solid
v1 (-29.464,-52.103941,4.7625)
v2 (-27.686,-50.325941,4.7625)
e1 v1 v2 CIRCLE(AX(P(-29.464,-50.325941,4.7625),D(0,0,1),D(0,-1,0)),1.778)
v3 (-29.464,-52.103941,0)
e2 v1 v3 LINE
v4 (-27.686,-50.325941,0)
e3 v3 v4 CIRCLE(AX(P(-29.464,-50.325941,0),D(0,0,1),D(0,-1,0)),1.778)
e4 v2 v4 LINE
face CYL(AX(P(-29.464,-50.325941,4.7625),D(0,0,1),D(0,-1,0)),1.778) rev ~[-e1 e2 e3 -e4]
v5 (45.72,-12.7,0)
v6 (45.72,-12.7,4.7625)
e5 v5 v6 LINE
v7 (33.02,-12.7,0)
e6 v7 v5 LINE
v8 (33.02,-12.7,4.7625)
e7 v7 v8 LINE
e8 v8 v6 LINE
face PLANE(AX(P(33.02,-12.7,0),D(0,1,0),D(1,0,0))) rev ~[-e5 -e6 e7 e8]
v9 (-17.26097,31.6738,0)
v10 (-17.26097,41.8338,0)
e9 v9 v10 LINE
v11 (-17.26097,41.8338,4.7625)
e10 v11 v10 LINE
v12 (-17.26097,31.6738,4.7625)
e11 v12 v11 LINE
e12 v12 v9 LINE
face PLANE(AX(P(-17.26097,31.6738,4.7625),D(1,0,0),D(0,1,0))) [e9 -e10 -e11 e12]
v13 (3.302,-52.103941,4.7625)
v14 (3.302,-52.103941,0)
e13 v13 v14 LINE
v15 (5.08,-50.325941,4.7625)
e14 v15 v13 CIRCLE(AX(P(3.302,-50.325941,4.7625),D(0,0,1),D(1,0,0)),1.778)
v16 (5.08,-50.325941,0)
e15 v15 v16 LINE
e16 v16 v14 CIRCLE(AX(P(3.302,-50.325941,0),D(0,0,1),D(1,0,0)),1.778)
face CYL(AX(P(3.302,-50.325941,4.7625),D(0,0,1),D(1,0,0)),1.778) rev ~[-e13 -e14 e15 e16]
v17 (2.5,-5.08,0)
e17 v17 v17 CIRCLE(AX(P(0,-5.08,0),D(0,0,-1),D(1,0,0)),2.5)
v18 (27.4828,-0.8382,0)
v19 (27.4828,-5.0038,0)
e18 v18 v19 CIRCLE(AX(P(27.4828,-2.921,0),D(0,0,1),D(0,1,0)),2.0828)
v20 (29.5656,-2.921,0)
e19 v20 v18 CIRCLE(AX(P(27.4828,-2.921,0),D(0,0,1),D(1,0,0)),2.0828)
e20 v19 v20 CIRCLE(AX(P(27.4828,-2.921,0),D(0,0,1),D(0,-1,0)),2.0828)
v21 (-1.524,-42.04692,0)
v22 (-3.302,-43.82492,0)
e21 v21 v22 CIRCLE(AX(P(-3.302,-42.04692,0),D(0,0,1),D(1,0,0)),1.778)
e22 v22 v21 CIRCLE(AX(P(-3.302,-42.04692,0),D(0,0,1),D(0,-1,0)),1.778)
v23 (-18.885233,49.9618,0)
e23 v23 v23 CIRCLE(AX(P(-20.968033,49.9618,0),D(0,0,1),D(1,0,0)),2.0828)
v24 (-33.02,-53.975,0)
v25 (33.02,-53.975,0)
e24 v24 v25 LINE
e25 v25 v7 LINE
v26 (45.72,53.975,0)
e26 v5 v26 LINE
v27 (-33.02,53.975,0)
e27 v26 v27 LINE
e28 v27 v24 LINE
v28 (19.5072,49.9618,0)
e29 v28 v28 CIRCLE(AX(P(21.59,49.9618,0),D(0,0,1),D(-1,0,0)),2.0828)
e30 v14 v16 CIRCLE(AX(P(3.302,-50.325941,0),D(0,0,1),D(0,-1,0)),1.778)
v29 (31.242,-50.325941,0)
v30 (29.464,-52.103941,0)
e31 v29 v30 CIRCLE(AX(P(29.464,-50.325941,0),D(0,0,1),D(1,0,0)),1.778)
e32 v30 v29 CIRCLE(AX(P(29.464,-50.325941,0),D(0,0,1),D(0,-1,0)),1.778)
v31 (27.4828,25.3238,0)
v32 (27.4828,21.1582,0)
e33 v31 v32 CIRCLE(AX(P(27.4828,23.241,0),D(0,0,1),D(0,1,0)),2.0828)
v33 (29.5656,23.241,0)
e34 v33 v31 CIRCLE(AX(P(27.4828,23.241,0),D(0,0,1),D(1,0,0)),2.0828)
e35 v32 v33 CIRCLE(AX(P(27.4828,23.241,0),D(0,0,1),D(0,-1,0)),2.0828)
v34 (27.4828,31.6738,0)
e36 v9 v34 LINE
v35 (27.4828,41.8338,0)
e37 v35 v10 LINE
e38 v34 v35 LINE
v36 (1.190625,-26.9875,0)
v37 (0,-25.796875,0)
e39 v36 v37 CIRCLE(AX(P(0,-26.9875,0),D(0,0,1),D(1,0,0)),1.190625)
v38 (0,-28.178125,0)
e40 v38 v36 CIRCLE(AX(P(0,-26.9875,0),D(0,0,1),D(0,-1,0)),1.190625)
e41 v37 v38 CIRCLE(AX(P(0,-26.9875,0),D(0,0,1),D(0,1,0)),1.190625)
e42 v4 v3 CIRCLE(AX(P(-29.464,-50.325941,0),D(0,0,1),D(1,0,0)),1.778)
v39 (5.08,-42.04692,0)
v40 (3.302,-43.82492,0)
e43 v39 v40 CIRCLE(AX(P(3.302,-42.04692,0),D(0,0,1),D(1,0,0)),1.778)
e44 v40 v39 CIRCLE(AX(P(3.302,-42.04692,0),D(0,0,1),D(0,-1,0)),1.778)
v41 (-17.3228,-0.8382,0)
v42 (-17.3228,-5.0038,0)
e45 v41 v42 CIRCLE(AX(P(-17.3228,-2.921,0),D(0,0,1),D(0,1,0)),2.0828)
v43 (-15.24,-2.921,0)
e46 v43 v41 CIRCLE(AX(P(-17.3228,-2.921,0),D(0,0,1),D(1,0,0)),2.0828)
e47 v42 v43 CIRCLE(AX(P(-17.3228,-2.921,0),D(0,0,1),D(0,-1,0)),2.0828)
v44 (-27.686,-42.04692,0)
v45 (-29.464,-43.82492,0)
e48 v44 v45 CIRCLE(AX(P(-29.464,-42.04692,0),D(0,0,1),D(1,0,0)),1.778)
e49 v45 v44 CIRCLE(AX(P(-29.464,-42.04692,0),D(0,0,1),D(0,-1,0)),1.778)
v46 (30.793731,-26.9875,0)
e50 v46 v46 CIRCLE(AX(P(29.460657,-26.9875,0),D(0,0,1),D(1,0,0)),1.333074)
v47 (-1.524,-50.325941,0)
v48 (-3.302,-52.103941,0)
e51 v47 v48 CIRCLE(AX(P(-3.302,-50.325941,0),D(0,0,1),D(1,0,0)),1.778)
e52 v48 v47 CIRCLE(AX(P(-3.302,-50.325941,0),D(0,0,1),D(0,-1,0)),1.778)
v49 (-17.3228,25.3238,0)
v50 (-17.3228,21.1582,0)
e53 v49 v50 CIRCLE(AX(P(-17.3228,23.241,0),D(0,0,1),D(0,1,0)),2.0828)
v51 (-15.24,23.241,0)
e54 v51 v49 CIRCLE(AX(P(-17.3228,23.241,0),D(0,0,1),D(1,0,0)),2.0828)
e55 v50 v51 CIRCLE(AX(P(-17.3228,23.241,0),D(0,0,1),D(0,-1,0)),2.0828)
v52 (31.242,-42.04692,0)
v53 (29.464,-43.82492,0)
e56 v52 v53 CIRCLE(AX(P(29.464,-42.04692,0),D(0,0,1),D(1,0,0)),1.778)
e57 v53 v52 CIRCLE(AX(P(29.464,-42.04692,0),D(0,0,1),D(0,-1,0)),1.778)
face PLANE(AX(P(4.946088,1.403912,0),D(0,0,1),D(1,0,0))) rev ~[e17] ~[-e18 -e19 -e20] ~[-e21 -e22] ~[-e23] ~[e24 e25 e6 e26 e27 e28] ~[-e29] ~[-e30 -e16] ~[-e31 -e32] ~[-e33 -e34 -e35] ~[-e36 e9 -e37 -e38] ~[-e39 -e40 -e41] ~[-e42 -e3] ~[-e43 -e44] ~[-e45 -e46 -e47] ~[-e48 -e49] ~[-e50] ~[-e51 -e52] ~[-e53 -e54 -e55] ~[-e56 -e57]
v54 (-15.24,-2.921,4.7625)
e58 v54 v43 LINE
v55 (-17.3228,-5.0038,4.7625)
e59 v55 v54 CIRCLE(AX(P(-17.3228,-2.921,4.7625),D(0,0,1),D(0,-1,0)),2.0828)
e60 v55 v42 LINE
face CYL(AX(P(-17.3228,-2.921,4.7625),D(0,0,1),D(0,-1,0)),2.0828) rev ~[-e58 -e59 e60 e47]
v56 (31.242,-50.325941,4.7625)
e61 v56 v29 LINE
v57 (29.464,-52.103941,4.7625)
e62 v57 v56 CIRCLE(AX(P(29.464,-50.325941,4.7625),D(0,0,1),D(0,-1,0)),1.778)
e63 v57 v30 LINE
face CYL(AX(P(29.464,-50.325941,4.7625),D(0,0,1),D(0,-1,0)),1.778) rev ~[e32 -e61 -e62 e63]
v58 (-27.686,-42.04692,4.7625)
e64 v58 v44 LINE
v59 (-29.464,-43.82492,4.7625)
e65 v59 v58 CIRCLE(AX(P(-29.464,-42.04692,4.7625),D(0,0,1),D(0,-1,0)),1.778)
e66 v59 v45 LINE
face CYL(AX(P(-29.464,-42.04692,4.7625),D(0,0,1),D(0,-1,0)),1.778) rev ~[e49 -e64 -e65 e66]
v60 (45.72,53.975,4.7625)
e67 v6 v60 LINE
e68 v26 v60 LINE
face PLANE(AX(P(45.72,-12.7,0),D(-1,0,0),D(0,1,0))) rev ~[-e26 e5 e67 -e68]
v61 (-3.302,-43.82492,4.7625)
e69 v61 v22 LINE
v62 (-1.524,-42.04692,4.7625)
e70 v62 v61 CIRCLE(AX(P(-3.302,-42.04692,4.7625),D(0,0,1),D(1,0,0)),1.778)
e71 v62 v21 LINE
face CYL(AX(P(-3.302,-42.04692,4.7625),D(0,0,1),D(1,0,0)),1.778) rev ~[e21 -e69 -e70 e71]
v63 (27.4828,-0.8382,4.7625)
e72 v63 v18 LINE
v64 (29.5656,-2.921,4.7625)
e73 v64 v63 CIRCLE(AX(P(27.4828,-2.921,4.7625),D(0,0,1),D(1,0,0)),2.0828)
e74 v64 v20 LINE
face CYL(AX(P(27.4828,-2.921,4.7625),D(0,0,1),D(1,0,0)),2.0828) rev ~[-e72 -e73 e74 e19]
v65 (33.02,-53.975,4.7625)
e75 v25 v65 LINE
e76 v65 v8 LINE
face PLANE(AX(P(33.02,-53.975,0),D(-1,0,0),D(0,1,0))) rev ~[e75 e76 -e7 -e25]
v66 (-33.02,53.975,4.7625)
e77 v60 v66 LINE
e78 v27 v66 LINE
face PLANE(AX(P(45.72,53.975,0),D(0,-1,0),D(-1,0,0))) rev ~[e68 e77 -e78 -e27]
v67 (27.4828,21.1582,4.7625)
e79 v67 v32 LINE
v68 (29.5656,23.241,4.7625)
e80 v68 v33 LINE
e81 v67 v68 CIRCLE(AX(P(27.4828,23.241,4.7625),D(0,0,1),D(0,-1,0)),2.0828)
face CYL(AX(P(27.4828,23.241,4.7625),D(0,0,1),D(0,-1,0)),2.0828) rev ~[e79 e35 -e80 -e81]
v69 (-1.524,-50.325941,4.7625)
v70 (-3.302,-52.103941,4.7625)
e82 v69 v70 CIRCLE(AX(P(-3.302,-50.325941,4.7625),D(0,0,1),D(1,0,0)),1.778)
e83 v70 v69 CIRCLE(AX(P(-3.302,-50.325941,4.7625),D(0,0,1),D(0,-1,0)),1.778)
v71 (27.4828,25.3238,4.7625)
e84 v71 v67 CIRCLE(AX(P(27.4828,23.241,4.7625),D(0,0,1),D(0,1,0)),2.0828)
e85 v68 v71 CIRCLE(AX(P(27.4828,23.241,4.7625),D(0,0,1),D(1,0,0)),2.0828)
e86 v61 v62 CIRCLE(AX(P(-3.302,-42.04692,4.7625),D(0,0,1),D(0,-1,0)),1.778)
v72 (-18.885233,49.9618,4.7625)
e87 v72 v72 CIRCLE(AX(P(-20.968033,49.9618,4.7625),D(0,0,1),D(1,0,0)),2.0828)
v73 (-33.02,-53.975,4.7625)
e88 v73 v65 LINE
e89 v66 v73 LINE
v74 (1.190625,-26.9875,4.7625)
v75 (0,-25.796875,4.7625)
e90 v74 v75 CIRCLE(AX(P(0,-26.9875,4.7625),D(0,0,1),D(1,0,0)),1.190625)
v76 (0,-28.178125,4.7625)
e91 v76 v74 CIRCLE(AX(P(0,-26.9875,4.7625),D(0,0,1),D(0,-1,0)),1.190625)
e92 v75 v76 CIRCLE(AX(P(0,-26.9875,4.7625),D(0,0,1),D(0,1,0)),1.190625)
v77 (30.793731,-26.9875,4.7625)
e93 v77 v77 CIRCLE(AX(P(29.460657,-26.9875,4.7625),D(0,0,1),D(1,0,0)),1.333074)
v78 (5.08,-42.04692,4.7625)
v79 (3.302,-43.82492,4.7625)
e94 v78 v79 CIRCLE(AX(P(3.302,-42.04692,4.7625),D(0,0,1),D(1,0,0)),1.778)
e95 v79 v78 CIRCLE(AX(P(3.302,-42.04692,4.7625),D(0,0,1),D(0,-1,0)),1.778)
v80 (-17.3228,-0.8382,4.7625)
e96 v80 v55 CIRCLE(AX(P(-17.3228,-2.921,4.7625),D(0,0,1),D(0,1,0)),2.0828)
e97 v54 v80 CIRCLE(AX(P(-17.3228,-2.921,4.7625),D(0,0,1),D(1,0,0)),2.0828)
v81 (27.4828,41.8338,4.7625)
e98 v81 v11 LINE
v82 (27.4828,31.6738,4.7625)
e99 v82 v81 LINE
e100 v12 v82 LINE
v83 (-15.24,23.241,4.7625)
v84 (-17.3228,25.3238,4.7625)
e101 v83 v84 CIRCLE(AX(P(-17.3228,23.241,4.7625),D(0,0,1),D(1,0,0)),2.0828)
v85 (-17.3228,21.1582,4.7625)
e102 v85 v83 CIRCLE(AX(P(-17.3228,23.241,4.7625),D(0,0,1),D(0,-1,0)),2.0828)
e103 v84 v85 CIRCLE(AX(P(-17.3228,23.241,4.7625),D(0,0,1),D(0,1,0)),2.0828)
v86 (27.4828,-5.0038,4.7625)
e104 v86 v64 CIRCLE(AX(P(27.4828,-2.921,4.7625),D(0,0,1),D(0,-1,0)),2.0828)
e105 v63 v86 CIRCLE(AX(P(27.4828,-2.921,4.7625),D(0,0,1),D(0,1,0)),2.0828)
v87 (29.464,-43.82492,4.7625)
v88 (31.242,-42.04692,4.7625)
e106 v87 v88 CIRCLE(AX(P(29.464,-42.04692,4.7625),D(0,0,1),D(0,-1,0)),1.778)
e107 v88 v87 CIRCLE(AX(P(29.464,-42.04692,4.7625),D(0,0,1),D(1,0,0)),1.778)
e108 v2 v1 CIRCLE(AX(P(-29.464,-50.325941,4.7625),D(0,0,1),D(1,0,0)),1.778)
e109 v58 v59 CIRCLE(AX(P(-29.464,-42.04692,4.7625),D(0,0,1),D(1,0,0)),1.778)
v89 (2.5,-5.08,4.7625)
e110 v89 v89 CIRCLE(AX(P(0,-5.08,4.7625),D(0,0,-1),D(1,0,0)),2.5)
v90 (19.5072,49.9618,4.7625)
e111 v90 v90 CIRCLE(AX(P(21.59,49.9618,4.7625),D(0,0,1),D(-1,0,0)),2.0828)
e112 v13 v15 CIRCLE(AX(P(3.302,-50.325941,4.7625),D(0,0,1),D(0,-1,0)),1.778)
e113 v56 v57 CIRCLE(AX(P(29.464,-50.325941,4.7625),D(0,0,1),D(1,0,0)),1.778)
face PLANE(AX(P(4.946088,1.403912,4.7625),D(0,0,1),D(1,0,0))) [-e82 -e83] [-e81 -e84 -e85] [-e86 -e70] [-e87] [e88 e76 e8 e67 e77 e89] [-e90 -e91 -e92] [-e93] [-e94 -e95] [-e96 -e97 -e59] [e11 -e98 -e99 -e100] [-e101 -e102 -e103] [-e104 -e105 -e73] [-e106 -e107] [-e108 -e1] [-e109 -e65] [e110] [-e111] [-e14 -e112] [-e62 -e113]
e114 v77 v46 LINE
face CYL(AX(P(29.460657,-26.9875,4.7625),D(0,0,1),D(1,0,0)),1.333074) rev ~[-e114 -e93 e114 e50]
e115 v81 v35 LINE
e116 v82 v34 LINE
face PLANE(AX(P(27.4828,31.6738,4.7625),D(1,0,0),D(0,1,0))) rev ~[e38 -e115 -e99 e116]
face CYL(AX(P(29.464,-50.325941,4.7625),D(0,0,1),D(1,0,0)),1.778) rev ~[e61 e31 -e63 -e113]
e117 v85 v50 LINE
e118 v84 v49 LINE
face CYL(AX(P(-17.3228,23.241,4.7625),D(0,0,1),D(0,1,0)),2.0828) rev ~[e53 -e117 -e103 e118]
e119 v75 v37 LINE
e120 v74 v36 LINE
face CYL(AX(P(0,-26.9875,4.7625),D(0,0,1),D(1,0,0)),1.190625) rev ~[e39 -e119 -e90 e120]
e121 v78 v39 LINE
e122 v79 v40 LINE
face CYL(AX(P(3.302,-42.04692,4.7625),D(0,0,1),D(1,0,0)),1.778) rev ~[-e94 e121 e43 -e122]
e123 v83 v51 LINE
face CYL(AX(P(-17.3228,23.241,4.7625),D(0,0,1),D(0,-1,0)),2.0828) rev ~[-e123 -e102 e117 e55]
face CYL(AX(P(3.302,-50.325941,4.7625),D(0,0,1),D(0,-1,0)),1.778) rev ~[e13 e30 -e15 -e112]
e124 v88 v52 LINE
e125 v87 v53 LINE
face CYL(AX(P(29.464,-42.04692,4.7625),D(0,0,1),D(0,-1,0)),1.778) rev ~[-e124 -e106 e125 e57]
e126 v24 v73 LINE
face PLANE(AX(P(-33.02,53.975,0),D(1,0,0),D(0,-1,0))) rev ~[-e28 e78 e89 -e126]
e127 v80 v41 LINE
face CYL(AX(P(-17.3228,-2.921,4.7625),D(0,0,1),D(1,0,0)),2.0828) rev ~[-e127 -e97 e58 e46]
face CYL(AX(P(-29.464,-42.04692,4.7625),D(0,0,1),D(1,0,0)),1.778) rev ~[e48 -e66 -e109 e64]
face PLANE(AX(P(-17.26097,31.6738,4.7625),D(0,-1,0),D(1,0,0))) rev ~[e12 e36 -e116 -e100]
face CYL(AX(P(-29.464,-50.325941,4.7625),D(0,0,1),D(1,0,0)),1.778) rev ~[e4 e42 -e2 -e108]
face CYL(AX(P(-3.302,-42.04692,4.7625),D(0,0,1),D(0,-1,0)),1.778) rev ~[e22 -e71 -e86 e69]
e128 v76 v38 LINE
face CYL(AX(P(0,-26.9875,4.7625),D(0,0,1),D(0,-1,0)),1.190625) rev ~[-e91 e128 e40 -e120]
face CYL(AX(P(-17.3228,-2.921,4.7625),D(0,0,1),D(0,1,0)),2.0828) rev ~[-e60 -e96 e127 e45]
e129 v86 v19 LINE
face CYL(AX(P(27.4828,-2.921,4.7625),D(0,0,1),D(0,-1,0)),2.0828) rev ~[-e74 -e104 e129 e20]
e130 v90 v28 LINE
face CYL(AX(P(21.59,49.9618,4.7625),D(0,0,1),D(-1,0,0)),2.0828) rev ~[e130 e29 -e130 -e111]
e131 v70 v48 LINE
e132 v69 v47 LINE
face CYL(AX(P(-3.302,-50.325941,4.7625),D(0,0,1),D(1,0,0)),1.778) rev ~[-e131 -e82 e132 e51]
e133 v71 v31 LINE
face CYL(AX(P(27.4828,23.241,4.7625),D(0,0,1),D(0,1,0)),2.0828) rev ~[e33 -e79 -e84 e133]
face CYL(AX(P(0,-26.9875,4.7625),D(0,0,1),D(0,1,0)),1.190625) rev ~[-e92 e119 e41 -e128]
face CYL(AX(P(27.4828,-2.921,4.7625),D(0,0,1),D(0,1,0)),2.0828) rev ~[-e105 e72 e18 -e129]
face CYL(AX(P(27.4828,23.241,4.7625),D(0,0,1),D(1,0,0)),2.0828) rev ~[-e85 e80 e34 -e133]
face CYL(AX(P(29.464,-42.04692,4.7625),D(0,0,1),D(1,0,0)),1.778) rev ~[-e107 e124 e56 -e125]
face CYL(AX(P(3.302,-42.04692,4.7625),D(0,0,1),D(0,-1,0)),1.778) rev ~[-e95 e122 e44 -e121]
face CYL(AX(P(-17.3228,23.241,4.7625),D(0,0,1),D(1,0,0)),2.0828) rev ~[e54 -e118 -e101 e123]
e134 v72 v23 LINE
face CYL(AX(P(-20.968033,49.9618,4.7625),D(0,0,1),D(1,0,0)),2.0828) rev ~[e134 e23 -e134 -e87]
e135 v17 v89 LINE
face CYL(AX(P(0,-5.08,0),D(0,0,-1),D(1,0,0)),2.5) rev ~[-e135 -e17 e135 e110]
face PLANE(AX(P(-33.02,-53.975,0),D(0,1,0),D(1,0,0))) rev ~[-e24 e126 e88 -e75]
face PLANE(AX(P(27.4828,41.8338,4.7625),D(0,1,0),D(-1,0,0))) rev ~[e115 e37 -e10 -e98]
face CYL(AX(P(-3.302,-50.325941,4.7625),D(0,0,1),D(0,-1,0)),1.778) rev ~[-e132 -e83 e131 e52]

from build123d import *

# Parameters (mm, degrees)
F1_DEPTH  = 4.7625
F2_W      = 23.6109700747
F2_H      = 10.16
F2_W_2    = 21.1328
F3_DEPTH  = 25.4
F4_R      = 2.5
F5_DEPTH  = 25.4
F6_R      = 1.3330740387
F7_DEPTH  = 25.4
F2_R      = 2.0828
F8_DEPTH  = 25.4
F10_DEPTH = 25.4


# Not quite as in the source:
# - a feature names something its author has since deleted; it is built from what else it names


with BuildPart() as f1:
    # F0 (on Top) → F1 (new body)
    with BuildSketch(Plane.XY):
        Polygon((45.72, 53.975), (33.02, 53.975), (-33.02, 53.975), (-33.02, -53.975), (33.02, -53.975), (33.02, -12.7), (45.72, -12.7), align=None)
    extrude(amount=F1_DEPTH)

    # F2 (on face) → F3 (cut)
    with BuildSketch(Plane.XY.offset(4.7625)):
        with Locations((-5.4554850374, 36.7538)):
            Rectangle(F2_W, F2_H)
        with Locations((16.9164, 36.7538)):
            Rectangle(F2_W_2, F2_H)
        with BuildLine():
            ThreePointArc((29.5656, 23.241), (28.9555620039, 24.7137620039), (27.4828, 25.3238))
            Line((27.4828, 25.3238), (27.4828, 21.1582))
            ThreePointArc((27.4828, 21.1582), (28.9555620039, 21.7682379961), (29.5656, 23.241))
        make_face()
        with BuildLine():
            Line((27.4828, 21.1582), (27.4828, 25.3238))
            ThreePointArc((27.4828, 25.3238), (25.4, 23.241), (27.4828, 21.1582))
        make_face()
        with BuildLine():
            ThreePointArc((27.4828, -0.8382), (25.4, -2.921), (27.4828, -5.0038))
            Line((27.4828, -5.0038), (27.4828, -0.8382))
        make_face()
        with BuildLine():
            Line((27.4828, -0.8382), (27.4828, -5.0038))
            ThreePointArc((27.4828, -5.0038), (28.9555620039, -4.3937620039), (29.5656, -2.921))
            ThreePointArc((29.5656, -2.921), (28.9555620039, -1.4482379961), (27.4828, -0.8382))
        make_face()
        with BuildLine():
            ThreePointArc((-15.24, 23.241), (-15.8500379961, 24.7137620039), (-17.3228, 25.3238))
            Line((-17.3228, 25.3238), (-17.3228, 21.1582))
            ThreePointArc((-17.3228, 21.1582), (-15.8500379961, 21.7682379961), (-15.24, 23.241))
        make_face()
        with BuildLine():
            Line((-17.3228, 21.1582), (-17.3228, 25.3238))
            ThreePointArc((-17.3228, 25.3238), (-19.4056, 23.241), (-17.3228, 21.1582))
        make_face()
        with BuildLine():
            ThreePointArc((-17.3228, -0.8382), (-19.4056, -2.921), (-17.3228, -5.0038))
            Line((-17.3228, -5.0038), (-17.3228, -0.8382))
        make_face()
        with BuildLine():
            Line((-17.3228, -0.8382), (-17.3228, -5.0038))
            ThreePointArc((-17.3228, -5.0038), (-15.8500379961, -4.3937620039), (-15.24, -2.921))
            ThreePointArc((-15.24, -2.921), (-15.8500379961, -1.4482379961), (-17.3228, -0.8382))
        make_face()
    extrude(amount=-F3_DEPTH, mode=Mode.SUBTRACT)

    # F4 (on face) → F5 (cut)
    with BuildSketch(Plane(origin=(0, 0, 0), x_dir=(1, 0, 0), z_dir=(0, 0, -1))):
        with Locations((0, 5.08)):
            Circle(F4_R)
    extrude(amount=-F5_DEPTH, mode=Mode.SUBTRACT)

    # F6 (on face) → F7 (cut)
    with BuildSketch(Plane.XY.offset(4.7625)):
        with BuildLine():
            Line((0, -28.178125), (0, -25.796875))
            ThreePointArc((0, -25.796875), (-1.190625, -26.9875), (0, -28.178125))
        make_face()
        with BuildLine():
            ThreePointArc((0, -28.178125), (0.8418990114, -27.8293990114), (1.190625, -26.9875))
            ThreePointArc((1.190625, -26.9875), (0.8418990114, -26.1456009886), (0, -25.796875))
            Line((0, -25.796875), (0, -28.178125))
        make_face()
        with Locations((29.460657388, -26.9875)):
            Circle(F6_R)
    extrude(amount=-F7_DEPTH, mode=Mode.SUBTRACT)

    # F2 (on face) → F8 (cut)
    with BuildSketch(Plane.XY.offset(4.7625)):
        with Locations((-20.9680330008, 49.9618)):
            Circle(F2_R)
        with BuildLine():
            ThreePointArc((23.6728, 49.9618), (21.59, 52.0446), (19.5072, 49.9618))
            ThreePointArc((19.5072, 49.9618), (21.59, 47.879), (23.6728, 49.9618))
        make_face()
    extrude(amount=-F8_DEPTH, mode=Mode.SUBTRACT)

    # F9 (on face) → F10 (cut)
    with BuildSketch(Plane.XY.offset(4.7625)):
        with BuildLine():
            Line((-29.464, -48.5479413316), (-29.464, -52.1039413316))
            ThreePointArc((-29.464, -52.1039413316), (-28.2067641431, -51.5831771885), (-27.686, -50.3259413316))
            ThreePointArc((-27.686, -50.3259413316), (-28.2067641431, -49.0687054746), (-29.464, -48.5479413316))
        make_face()
        with BuildLine():
            ThreePointArc((-29.464, -48.5479413316), (-31.242, -50.3259413316), (-29.464, -52.1039413316))
            Line((-29.464, -52.1039413316), (-29.464, -48.5479413316))
        make_face()
        with BuildLine():
            ThreePointArc((-27.686, -42.0469199679), (-28.2067641431, -40.7896841109), (-29.464, -40.2689199679))
            Line((-29.464, -40.2689199679), (-29.464, -43.8249199679))
            ThreePointArc((-29.464, -43.8249199679), (-28.2067641431, -43.3041558248), (-27.686, -42.0469199679))
        make_face()
        with BuildLine():
            Line((-29.464, -43.8249199679), (-29.464, -40.2689199679))
            ThreePointArc((-29.464, -40.2689199679), (-31.242, -42.0469199679), (-29.464, -43.8249199679))
        make_face()
        with BuildLine():
            Line((-3.302, -43.8249199679), (-3.302, -40.2689199679))
            ThreePointArc((-3.302, -40.2689199679), (-5.08, -42.0469199679), (-3.302, -43.8249199679))
        make_face()
        with BuildLine():
            ThreePointArc((-1.524, -42.0469199679), (-2.0447641431, -40.7896841109), (-3.302, -40.2689199679))
            Line((-3.302, -40.2689199679), (-3.302, -43.8249199679))
            ThreePointArc((-3.302, -43.8249199679), (-2.0447641431, -43.3041558248), (-1.524, -42.0469199679))
        make_face()
        with BuildLine():
            ThreePointArc((-3.302, -48.5479413316), (-5.08, -50.3259413316), (-3.302, -52.1039413316))
            Line((-3.302, -52.1039413316), (-3.302, -48.5479413316))
        make_face()
        with BuildLine():
            Line((-3.302, -48.5479413316), (-3.302, -52.1039413316))
            ThreePointArc((-3.302, -52.1039413316), (-2.0447641431, -51.5831771885), (-1.524, -50.3259413316))
            ThreePointArc((-1.524, -50.3259413316), (-2.0447641431, -49.0687054746), (-3.302, -48.5479413316))
        make_face()
        with BuildLine():
            ThreePointArc((3.302, -48.5479413316), (1.524, -50.3259413316), (3.302, -52.1039413316))
            Line((3.302, -52.1039413316), (3.302, -48.5479413316))
        make_face()
        with BuildLine():
            Line((3.302, -48.5479413316), (3.302, -52.1039413316))
            ThreePointArc((3.302, -52.1039413316), (4.5592358569, -51.5831771885), (5.08, -50.3259413316))
            ThreePointArc((5.08, -50.3259413316), (4.5592358569, -49.0687054746), (3.302, -48.5479413316))
        make_face()
        with BuildLine():
            ThreePointArc((5.08, -42.0469199679), (4.5592358569, -40.7896841109), (3.302, -40.2689199679))
            Line((3.302, -40.2689199679), (3.302, -43.8249199679))
            ThreePointArc((3.302, -43.8249199679), (4.5592358569, -43.3041558248), (5.08, -42.0469199679))
        make_face()
        with BuildLine():
            Line((3.302, -43.8249199679), (3.302, -40.2689199679))
            ThreePointArc((3.302, -40.2689199679), (1.524, -42.0469199679), (3.302, -43.8249199679))
        make_face()
        with BuildLine():
            Line((29.464, -43.8249199679), (29.464, -40.2689199679))
            ThreePointArc((29.464, -40.2689199679), (27.686, -42.0469199679), (29.464, -43.8249199679))
        make_face()
        with BuildLine():
            ThreePointArc((31.242, -42.0469199679), (30.7212358569, -40.7896841109), (29.464, -40.2689199679))
            Line((29.464, -40.2689199679), (29.464, -43.8249199679))
            ThreePointArc((29.464, -43.8249199679), (30.7212358569, -43.3041558248), (31.242, -42.0469199679))
        make_face()
        with BuildLine():
            Line((29.464, -48.5479413316), (29.464, -52.1039413316))
            ThreePointArc((29.464, -52.1039413316), (30.7212358569, -51.5831771885), (31.242, -50.3259413316))
            ThreePointArc((31.242, -50.3259413316), (30.7212358569, -49.0687054746), (29.464, -48.5479413316))
        make_face()
        with BuildLine():
            ThreePointArc((29.464, -48.5479413316), (27.686, -50.3259413316), (29.464, -52.1039413316))
            Line((29.464, -52.1039413316), (29.464, -48.5479413316))
        make_face()
    extrude(amount=-F10_DEPTH, mode=Mode.SUBTRACT)


solid = f1.part
